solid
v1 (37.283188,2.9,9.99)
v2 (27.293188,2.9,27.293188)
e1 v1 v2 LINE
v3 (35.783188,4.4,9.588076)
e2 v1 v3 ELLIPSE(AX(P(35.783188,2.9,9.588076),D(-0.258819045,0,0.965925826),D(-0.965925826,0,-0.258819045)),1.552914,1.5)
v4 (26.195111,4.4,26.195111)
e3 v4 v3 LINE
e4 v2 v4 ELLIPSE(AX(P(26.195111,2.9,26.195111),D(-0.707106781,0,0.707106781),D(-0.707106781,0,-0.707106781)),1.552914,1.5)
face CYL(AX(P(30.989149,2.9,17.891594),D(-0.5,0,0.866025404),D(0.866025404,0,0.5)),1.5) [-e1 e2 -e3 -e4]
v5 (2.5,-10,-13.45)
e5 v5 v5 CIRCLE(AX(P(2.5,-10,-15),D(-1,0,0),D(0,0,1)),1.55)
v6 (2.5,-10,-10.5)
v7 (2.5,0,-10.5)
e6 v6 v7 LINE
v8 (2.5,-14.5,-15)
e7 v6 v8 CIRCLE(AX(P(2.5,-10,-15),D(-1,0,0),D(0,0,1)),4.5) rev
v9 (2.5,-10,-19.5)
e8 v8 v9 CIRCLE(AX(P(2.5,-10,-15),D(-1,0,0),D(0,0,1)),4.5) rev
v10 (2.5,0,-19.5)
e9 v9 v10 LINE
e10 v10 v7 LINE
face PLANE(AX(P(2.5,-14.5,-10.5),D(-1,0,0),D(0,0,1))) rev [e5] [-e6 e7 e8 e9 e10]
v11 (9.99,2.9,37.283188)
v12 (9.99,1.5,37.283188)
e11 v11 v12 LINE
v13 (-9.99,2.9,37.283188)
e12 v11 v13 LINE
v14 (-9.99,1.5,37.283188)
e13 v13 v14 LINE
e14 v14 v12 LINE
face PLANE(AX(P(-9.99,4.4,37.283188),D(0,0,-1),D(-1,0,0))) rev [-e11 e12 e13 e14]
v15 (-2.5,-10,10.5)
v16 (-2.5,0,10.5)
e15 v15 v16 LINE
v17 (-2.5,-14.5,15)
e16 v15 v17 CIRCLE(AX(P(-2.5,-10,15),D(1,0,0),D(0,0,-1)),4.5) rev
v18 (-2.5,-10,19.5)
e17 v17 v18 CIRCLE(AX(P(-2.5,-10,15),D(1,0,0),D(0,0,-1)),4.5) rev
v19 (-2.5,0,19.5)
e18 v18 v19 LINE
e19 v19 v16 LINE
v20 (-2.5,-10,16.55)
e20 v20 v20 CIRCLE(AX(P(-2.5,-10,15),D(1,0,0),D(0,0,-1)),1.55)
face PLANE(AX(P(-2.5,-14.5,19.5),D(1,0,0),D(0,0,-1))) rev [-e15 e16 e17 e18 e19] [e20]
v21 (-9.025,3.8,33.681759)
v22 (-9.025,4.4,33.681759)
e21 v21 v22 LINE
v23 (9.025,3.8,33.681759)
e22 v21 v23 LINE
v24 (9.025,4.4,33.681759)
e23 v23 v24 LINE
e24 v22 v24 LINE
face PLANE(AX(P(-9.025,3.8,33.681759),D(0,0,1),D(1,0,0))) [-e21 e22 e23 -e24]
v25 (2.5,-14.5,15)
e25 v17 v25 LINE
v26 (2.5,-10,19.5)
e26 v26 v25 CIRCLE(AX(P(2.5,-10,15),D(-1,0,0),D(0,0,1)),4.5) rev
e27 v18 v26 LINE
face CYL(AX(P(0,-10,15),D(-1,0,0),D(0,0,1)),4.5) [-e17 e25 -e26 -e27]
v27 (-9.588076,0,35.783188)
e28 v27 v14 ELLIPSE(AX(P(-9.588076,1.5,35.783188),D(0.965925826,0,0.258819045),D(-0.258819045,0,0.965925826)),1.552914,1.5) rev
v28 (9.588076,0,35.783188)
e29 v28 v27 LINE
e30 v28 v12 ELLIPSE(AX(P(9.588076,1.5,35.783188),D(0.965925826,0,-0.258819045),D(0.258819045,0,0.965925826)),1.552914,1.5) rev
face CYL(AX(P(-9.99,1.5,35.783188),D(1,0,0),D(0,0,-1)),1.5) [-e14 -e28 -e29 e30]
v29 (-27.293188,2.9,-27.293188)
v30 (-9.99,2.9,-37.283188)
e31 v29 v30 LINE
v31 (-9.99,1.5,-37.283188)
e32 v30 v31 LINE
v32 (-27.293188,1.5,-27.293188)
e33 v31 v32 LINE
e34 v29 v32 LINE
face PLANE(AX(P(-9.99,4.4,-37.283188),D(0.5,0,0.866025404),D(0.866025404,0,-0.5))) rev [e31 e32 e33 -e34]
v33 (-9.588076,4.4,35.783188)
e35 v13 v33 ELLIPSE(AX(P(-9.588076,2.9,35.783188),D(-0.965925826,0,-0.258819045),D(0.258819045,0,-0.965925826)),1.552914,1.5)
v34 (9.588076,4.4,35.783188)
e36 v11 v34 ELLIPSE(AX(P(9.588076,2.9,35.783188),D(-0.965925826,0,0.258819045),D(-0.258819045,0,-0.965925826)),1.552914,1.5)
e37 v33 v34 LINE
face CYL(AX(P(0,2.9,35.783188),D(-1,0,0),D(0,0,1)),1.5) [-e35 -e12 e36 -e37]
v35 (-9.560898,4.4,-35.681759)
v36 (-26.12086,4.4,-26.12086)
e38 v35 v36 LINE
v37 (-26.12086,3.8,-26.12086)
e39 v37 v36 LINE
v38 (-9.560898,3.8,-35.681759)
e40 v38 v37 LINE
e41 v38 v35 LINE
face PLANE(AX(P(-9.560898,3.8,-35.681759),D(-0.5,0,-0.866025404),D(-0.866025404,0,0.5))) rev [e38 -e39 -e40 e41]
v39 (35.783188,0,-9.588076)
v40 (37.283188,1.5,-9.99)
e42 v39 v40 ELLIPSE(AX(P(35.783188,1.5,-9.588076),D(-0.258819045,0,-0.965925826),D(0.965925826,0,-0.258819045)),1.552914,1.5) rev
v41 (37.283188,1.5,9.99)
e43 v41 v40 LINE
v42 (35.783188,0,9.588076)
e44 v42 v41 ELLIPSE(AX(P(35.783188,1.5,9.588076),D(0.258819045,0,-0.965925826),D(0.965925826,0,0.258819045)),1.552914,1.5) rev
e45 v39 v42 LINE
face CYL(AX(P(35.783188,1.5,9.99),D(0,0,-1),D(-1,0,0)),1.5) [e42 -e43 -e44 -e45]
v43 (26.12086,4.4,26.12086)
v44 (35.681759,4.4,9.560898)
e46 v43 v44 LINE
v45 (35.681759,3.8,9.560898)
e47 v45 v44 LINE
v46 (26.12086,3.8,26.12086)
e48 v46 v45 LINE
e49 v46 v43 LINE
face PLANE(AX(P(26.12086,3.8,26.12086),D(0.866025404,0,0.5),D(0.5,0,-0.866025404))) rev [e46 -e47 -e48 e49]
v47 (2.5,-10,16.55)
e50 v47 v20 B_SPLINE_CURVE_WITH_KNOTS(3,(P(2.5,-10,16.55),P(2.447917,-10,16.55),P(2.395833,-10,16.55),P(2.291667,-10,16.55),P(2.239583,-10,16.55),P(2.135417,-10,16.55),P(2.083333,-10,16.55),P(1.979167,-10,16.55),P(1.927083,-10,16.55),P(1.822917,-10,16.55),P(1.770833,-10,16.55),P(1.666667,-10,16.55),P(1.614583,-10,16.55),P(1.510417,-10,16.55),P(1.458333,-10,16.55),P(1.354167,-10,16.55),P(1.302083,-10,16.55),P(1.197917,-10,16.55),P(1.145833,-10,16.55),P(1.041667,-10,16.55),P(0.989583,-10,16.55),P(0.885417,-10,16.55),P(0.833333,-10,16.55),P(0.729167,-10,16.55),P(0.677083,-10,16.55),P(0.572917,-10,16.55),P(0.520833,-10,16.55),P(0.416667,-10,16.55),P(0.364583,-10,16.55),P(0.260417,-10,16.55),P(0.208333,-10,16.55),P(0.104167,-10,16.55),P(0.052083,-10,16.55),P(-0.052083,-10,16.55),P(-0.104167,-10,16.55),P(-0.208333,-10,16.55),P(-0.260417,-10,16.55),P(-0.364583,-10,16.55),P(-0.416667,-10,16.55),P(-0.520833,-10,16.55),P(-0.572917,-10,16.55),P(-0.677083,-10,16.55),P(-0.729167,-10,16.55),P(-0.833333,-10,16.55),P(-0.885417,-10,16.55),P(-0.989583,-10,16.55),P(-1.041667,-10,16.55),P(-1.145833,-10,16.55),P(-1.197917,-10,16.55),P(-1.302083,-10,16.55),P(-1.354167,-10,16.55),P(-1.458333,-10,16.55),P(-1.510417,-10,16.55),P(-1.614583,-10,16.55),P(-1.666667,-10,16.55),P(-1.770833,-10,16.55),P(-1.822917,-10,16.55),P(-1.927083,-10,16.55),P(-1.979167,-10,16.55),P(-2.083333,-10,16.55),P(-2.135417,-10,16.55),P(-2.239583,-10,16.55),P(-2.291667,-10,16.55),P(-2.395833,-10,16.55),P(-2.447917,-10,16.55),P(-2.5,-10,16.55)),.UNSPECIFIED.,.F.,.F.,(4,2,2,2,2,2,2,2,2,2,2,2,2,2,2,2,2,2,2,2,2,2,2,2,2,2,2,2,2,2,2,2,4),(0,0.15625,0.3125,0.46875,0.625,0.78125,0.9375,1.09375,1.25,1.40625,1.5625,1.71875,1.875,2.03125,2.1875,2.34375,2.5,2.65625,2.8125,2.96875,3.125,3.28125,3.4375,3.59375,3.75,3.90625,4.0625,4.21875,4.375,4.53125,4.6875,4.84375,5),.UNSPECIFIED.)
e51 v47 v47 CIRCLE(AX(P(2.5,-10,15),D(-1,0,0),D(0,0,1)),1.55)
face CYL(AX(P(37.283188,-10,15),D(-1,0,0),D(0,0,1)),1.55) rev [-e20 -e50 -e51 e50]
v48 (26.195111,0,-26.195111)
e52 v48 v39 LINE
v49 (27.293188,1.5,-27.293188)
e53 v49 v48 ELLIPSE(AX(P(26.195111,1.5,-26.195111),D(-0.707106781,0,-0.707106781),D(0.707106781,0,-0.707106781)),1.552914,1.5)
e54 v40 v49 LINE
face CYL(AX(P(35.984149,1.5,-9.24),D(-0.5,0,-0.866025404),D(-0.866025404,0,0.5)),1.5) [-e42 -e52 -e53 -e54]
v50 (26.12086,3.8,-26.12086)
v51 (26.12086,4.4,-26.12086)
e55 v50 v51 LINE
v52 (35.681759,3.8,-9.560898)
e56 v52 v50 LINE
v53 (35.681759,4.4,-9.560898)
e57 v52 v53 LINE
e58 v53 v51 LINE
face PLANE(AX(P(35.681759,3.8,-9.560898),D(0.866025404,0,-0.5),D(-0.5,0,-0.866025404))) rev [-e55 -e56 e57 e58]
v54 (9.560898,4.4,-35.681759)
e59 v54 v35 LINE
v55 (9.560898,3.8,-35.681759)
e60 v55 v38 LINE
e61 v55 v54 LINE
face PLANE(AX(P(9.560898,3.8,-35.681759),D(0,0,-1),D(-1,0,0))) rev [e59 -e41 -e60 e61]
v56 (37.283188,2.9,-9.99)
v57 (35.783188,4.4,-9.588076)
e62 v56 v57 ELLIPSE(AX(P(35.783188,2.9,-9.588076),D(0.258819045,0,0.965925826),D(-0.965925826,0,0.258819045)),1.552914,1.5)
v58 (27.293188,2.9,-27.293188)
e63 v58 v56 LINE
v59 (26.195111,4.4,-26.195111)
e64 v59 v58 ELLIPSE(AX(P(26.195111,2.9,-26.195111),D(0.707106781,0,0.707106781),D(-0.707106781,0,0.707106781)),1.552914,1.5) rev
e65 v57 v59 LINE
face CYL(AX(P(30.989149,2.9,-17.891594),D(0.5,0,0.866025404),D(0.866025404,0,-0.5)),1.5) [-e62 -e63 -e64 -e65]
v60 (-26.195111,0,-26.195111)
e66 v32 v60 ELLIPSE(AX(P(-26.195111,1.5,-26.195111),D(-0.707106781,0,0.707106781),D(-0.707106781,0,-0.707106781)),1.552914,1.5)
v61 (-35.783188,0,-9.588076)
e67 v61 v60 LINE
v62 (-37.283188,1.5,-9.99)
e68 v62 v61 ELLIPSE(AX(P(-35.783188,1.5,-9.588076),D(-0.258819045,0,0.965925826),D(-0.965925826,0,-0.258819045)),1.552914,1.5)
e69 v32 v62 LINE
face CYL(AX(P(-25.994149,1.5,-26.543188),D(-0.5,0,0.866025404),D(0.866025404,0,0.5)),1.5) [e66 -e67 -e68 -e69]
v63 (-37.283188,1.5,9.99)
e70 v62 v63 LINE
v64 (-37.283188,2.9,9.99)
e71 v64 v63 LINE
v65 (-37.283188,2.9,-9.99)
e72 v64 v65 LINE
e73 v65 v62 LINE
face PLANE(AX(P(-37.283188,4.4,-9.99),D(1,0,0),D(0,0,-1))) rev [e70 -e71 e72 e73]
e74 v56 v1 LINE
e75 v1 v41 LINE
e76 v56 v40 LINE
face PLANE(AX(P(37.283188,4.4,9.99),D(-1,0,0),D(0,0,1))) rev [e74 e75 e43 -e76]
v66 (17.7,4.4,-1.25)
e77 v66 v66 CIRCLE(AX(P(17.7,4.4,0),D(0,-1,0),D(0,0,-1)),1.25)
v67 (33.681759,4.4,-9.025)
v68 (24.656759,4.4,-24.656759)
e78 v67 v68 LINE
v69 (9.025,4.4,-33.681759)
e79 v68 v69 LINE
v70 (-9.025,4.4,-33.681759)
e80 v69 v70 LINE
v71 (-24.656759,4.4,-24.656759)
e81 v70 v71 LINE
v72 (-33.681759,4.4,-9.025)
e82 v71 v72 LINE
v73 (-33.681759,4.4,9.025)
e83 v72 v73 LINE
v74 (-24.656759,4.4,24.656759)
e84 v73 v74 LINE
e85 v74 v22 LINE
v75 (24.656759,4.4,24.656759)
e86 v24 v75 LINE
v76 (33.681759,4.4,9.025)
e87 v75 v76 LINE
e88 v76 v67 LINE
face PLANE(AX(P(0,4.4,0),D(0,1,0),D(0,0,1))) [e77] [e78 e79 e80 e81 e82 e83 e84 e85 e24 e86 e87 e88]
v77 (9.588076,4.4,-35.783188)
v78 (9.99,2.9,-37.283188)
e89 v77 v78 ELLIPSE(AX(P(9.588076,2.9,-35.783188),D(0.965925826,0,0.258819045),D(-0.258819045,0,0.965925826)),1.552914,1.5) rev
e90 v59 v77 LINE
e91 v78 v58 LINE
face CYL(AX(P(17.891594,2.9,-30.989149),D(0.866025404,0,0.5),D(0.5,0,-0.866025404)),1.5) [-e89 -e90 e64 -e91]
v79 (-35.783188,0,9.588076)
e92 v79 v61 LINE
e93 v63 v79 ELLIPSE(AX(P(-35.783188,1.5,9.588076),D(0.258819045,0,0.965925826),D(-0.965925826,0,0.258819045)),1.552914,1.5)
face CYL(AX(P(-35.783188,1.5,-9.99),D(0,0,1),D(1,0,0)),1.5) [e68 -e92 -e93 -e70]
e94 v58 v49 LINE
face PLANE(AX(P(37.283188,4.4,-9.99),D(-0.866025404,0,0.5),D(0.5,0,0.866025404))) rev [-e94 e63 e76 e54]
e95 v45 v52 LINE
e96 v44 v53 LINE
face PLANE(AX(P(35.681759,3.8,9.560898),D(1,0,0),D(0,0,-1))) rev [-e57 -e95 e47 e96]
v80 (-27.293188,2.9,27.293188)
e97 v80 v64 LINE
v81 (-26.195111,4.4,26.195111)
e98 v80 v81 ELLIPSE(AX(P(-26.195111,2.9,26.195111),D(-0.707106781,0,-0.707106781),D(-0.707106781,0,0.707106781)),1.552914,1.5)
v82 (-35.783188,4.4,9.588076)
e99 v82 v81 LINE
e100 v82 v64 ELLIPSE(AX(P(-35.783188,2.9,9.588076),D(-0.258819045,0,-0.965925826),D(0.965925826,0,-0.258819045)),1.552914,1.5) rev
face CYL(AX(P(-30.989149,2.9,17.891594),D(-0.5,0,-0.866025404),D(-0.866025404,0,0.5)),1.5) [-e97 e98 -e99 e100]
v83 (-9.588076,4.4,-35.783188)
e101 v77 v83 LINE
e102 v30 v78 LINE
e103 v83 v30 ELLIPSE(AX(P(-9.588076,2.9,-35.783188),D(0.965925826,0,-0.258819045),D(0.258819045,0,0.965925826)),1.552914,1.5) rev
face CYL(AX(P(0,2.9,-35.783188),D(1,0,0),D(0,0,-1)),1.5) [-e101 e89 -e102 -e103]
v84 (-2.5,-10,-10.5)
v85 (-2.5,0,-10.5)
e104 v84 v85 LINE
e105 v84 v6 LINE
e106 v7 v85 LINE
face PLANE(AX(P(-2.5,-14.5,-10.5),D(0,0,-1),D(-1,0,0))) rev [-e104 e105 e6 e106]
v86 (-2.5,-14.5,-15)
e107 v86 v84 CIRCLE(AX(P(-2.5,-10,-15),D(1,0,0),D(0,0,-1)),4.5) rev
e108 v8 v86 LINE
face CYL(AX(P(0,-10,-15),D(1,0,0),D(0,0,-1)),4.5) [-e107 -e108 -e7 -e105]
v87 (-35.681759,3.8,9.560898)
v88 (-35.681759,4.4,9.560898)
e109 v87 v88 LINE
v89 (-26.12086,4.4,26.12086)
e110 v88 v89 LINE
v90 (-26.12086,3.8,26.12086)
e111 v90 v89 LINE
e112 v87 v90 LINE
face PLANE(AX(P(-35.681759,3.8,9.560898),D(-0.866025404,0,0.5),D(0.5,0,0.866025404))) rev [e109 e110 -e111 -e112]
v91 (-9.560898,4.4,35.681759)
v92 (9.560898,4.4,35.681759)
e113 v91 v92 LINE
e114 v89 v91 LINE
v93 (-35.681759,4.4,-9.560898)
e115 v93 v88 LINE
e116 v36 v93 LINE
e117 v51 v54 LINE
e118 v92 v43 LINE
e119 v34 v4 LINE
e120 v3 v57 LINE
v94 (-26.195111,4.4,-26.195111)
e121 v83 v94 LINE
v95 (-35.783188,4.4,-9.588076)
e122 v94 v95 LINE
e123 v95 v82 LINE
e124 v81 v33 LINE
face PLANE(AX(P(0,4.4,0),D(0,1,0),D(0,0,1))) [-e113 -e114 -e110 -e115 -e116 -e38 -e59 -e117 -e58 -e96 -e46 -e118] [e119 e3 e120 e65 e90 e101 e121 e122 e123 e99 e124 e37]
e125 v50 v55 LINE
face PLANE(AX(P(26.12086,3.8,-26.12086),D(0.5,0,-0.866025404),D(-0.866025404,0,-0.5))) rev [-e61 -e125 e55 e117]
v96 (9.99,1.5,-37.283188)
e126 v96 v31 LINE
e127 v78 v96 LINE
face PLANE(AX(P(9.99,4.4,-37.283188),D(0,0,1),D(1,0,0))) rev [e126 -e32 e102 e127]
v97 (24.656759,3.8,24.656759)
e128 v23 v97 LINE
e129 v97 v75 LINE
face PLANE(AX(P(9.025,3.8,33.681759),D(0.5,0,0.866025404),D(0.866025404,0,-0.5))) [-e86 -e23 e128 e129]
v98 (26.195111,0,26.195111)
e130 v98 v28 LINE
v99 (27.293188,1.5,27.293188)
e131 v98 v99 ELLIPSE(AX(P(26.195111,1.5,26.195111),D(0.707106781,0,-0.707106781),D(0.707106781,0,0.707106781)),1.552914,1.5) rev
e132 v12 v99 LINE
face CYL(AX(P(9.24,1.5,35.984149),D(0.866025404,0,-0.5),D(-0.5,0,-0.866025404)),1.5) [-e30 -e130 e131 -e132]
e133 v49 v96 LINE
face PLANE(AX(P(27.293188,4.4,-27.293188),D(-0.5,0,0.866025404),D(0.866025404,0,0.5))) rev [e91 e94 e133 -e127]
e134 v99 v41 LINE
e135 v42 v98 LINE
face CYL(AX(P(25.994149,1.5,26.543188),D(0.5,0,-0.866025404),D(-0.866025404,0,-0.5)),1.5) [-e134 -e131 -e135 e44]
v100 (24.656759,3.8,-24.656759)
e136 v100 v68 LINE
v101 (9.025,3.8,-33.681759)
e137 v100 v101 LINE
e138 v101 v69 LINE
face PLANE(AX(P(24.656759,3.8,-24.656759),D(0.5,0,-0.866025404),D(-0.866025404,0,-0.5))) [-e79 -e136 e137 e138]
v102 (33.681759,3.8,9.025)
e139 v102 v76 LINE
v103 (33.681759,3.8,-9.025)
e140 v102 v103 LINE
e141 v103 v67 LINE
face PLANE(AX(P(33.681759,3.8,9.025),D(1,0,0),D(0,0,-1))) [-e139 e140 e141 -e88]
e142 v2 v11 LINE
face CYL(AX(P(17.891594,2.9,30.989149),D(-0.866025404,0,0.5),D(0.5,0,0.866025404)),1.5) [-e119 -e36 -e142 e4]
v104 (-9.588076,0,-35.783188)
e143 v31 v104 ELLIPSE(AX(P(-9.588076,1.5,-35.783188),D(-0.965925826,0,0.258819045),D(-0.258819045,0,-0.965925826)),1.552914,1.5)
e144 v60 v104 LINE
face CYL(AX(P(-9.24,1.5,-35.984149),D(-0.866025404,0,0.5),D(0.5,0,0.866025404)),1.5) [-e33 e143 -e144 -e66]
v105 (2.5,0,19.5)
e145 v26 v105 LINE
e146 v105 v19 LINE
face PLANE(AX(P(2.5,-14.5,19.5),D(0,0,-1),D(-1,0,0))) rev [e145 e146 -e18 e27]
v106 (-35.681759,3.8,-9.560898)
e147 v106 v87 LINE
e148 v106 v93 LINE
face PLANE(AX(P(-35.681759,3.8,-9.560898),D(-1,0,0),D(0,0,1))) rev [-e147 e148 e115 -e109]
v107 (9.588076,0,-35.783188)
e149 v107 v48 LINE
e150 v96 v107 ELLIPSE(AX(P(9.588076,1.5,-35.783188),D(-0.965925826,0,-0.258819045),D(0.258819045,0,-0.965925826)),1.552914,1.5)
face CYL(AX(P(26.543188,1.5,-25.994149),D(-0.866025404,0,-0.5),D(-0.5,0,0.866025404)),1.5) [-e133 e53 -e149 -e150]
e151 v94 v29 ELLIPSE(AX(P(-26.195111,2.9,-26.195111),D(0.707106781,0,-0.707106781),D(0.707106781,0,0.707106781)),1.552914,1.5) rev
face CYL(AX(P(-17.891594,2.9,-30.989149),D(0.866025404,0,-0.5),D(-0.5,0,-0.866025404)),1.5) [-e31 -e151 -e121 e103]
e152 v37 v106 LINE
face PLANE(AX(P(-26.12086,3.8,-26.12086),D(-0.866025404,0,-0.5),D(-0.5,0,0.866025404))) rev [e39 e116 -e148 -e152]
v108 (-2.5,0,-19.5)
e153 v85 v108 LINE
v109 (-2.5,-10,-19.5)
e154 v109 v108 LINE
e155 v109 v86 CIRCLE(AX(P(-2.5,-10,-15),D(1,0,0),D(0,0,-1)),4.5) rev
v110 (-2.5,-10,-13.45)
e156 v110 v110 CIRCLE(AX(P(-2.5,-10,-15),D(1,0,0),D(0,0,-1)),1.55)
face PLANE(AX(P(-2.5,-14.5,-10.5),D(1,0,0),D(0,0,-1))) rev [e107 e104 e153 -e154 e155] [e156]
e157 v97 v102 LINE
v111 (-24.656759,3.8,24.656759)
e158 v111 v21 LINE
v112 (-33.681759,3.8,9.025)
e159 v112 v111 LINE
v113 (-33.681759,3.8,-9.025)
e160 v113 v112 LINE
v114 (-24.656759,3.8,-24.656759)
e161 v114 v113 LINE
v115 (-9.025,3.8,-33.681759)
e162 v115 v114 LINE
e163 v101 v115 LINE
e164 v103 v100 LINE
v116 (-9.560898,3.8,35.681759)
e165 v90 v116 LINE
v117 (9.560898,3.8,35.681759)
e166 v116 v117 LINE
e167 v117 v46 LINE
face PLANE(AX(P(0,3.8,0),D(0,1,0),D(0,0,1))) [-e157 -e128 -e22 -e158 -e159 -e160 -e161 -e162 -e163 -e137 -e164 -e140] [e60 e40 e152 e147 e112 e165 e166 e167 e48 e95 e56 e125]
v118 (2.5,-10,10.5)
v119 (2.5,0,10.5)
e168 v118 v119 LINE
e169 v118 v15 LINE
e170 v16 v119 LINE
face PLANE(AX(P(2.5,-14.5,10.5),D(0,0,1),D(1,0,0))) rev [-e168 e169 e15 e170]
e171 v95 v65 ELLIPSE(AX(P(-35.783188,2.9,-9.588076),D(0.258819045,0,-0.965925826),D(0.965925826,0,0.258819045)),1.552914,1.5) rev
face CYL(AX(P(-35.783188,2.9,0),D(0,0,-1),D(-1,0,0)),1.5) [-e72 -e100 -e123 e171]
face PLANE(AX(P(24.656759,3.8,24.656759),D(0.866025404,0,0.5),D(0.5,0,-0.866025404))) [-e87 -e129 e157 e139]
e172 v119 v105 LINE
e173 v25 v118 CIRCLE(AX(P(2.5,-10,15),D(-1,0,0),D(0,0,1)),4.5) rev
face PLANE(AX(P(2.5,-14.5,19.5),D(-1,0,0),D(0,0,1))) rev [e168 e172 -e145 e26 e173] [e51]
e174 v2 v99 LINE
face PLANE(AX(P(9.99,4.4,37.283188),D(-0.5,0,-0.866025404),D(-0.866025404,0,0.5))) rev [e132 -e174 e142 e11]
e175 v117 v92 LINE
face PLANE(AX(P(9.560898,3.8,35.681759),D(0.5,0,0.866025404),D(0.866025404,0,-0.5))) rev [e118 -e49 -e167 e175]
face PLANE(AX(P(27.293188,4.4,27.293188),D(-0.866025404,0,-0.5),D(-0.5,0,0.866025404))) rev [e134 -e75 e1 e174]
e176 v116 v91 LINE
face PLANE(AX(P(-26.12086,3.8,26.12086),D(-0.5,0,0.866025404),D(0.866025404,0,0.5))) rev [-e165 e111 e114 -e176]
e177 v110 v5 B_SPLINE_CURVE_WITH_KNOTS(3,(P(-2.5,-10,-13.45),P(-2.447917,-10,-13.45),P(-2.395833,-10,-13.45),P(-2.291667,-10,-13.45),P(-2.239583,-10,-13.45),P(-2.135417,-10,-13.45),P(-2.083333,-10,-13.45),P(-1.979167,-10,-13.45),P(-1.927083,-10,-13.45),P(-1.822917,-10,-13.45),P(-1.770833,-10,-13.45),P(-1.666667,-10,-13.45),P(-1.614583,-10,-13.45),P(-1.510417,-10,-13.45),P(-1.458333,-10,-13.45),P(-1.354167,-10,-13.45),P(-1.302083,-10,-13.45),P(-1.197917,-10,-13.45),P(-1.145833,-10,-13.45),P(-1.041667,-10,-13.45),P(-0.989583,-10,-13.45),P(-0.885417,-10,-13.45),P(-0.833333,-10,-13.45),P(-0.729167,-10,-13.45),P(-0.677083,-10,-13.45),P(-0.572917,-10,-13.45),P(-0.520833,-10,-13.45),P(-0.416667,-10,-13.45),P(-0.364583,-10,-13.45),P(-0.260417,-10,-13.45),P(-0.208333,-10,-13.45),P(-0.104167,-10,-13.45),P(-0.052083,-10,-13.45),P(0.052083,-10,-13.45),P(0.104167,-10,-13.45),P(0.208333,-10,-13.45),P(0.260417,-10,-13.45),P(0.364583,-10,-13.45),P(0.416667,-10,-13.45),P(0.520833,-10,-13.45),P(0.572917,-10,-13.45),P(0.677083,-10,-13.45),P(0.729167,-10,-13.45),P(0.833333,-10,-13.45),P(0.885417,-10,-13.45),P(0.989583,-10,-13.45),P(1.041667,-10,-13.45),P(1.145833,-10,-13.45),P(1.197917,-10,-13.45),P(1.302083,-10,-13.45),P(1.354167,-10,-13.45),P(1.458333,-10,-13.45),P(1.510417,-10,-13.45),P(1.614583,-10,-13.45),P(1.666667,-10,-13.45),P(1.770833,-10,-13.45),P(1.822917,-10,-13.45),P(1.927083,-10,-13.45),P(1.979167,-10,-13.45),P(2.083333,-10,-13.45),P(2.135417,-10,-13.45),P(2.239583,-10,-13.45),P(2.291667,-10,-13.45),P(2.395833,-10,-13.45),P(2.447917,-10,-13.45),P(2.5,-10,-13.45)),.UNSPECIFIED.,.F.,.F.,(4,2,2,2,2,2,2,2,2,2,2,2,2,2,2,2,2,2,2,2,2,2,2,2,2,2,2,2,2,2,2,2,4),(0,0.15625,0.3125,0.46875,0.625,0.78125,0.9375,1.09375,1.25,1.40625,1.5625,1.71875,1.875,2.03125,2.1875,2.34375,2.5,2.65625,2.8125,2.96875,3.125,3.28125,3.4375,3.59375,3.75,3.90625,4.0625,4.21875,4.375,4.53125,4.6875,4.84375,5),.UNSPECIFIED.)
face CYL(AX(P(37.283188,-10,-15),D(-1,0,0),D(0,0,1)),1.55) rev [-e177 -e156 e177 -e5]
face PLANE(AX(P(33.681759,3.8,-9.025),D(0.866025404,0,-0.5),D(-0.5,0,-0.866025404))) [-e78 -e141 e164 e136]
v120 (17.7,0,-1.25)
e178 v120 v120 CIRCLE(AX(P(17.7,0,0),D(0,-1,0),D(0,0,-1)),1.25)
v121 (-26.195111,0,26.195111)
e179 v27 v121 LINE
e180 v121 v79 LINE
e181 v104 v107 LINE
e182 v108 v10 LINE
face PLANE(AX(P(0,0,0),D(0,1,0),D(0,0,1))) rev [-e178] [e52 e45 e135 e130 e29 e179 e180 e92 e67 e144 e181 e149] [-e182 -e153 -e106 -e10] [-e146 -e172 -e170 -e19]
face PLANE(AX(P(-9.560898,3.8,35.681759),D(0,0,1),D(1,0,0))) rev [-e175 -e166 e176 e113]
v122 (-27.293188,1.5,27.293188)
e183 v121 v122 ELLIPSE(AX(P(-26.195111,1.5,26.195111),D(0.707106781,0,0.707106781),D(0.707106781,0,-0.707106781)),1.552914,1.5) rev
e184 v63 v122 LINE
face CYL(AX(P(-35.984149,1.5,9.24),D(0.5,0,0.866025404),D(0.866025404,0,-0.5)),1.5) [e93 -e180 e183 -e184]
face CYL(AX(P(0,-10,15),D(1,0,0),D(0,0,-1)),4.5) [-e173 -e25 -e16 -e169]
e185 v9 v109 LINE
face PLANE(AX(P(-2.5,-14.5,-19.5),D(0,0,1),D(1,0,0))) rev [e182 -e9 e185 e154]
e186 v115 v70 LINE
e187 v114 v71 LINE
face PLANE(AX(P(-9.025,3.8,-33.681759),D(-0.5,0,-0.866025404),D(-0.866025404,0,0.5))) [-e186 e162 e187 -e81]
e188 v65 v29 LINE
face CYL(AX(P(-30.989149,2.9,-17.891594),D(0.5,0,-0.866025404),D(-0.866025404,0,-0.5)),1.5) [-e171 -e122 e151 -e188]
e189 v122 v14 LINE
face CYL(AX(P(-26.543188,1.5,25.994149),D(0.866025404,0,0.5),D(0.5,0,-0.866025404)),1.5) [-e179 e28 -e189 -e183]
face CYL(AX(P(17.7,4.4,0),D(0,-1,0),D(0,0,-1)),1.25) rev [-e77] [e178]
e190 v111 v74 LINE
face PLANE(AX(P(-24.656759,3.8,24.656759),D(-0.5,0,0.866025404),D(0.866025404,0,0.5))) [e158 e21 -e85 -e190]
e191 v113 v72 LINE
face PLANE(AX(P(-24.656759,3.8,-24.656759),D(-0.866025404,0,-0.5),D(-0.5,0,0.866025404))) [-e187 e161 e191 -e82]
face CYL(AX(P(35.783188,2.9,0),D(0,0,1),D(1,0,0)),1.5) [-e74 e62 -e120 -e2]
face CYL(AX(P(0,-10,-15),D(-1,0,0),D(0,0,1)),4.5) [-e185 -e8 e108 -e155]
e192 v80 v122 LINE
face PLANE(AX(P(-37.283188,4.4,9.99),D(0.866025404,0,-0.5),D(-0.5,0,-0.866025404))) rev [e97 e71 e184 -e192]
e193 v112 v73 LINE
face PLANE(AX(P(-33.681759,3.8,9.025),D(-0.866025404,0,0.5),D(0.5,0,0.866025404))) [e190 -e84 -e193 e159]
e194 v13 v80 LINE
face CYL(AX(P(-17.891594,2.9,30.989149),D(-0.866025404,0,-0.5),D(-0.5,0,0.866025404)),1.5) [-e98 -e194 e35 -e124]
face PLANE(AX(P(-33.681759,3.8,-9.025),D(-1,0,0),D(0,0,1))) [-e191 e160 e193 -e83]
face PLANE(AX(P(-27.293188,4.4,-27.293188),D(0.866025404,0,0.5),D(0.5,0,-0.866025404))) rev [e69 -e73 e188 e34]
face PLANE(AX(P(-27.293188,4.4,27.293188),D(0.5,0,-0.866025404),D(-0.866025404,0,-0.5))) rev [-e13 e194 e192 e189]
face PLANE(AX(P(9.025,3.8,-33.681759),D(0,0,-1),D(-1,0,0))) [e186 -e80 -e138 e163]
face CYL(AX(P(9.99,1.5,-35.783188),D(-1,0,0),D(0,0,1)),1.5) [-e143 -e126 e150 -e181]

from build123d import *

# Parameters (mm, degrees)
EXTRUDE_1_DEPTH          = 4.4
CUT_EXTRUDE_1_DEPTH      = 0.6
FILLET_1_R               = 1.5
SKETCH_3_W               = 5
SKETCH_3_H               = 9
EXTRUDE_2_DEPTH          = 14.5
FILLET_2_R               = 4.5
CUT_EXTRUDE_2_DEPTH      = 57.417976641
CUT_EXTRUDE_2_DEPTH_BACK = 57.417976641
SKETCH_4_R               = 1.55
CUT_EXTRUDE_3_DEPTH      = 55.68383811
CUT_EXTRUDE_3_DEPTH_BACK = 55.68383811
SKETCH_5_R               = 1.25


with BuildPart() as part:
    # 스케치1 → 보스-돌출1 (new body)
    with BuildSketch(Plane(origin=(0, 0, 0), x_dir=(1, 0, 0), z_dir=(0, 1, 0))):
        Polygon((27.293187568, -27.293187568), (37.283187568, -9.99), (37.283187568, 9.99), (27.293187568, 27.293187568), (9.99, 37.283187568), (-9.99, 37.283187568), (-27.293187568, 27.293187568), (-37.283187568, 9.99), (-37.283187568, -9.99), (-27.293187568, -27.293187568), (-9.99, -37.283187568), (9.99, -37.283187568), align=None)
    extrude(amount=EXTRUDE_1_DEPTH)

    # 스케치2 → 컷-돌출1 (cut)
    with BuildSketch(Plane(origin=(0, 4.4, 0), x_dir=(1, 0, 0), z_dir=(0, 1, 0))):
        Polygon((-26.120860153, 26.120860153), (-35.681758538, 9.560898385), (-35.681758538, -9.560898385), (-26.120860153, -26.120860153), (-9.560898385, -35.681758538), (9.560898385, -35.681758538), (26.120860153, -26.120860153), (35.681758538, -9.560898385), (35.681758538, 9.560898385), (26.120860153, 26.120860153), (9.560898385, 35.681758538), (-9.560898385, 35.681758538), align=None)
        Polygon((24.656758538, -24.656758538), (33.681758538, -9.025), (33.681758538, 9.025), (24.656758538, 24.656758538), (9.025, 33.681758538), (-9.025, 33.681758538), (-24.656758538, 24.656758538), (-33.681758538, 9.025), (-33.681758538, -9.025), (-24.656758538, -24.656758538), (-9.025, -33.681758538), (9.025, -33.681758538), align=None, mode=Mode.SUBTRACT)
    extrude(amount=-CUT_EXTRUDE_1_DEPTH, mode=Mode.SUBTRACT)

    # 필렛1
    fillet_1_edges = [part.edges().sort_by_distance(p)[0] for p in [
        (0, 0, 37.283187568),
        (-18.641593784, 0, 32.288187568),
        (37.283187568, 4.4, 0),
        (-32.288187568, 0, 18.641593784),
        (-37.283187568, 0, 0),
        (-32.288187568, 0, -18.641593784),
        (-18.641593784, 0, -32.288187568),
        (0, 0, -37.283187568),
        (18.641593784, 0, -32.288187568),
        (32.288187568, 0, -18.641593784),
        (37.283187568, 0, 0),
        (32.288187568, 0, 18.641593784),
        (18.641593784, 0, 32.288187568),
        (32.288187568, 4.4, -18.641593784),
        (18.641593784, 4.4, -32.288187568),
        (0, 4.4, -37.283187568),
        (-18.641593784, 4.4, -32.288187568),
        (-32.288187568, 4.4, -18.641593784),
        (-37.283187568, 4.4, 0),
        (-32.288187568, 4.4, 18.641593784),
        (-18.641593784, 4.4, 32.288187568),
        (0, 4.4, 37.283187568),
        (18.641593784, 4.4, 32.288187568),
        (32.288187568, 4.4, 18.641593784),
    ]]
    fillet(fillet_1_edges, radius=FILLET_1_R)

    # 스케치3 → 보스-돌출2 (add)
    with BuildSketch(Plane.XZ):
        with Locations((0, -15)):
            Rectangle(SKETCH_3_W, SKETCH_3_H)
        with Locations((0, 15)):
            Rectangle(SKETCH_3_W, SKETCH_3_H)
    extrude(amount=EXTRUDE_2_DEPTH)

    # 필렛2
    fillet_2_edges = [part.edges().sort_by_distance(p)[0] for p in [
        (0, -14.5, -19.5),
        (0, -14.5, -10.5),
        (0, -14.5, 19.5),
        (0, -14.5, 10.5),
    ]]
    fillet(fillet_2_edges, radius=FILLET_2_R - 0.0001)  # a hair under: the kernel refuses the full size

    # 스케치4 → 컷-돌출2 (cut, two sides: drawn at the far end of the back side and taken through both)
    with BuildSketch(Plane.ZY.offset(2.5).offset(-CUT_EXTRUDE_2_DEPTH_BACK)):
        with Locations((-15, -10)):
            Circle(SKETCH_4_R)
        with Locations((15, -10)):
            Circle(SKETCH_4_R)
    extrude(amount=CUT_EXTRUDE_2_DEPTH + CUT_EXTRUDE_2_DEPTH_BACK, mode=Mode.SUBTRACT)

    # 스케치5 → 컷-돌출3 (cut, two sides: drawn at the far end of the back side and taken through both)
    with BuildSketch(Plane.XZ.offset(-CUT_EXTRUDE_3_DEPTH_BACK)):
        with Locations(Location((17.7, 0, 0), (0, 0, 270))):
            Circle(SKETCH_5_R)
    extrude(amount=CUT_EXTRUDE_3_DEPTH + CUT_EXTRUDE_3_DEPTH_BACK, mode=Mode.SUBTRACT)


solid = part.part
